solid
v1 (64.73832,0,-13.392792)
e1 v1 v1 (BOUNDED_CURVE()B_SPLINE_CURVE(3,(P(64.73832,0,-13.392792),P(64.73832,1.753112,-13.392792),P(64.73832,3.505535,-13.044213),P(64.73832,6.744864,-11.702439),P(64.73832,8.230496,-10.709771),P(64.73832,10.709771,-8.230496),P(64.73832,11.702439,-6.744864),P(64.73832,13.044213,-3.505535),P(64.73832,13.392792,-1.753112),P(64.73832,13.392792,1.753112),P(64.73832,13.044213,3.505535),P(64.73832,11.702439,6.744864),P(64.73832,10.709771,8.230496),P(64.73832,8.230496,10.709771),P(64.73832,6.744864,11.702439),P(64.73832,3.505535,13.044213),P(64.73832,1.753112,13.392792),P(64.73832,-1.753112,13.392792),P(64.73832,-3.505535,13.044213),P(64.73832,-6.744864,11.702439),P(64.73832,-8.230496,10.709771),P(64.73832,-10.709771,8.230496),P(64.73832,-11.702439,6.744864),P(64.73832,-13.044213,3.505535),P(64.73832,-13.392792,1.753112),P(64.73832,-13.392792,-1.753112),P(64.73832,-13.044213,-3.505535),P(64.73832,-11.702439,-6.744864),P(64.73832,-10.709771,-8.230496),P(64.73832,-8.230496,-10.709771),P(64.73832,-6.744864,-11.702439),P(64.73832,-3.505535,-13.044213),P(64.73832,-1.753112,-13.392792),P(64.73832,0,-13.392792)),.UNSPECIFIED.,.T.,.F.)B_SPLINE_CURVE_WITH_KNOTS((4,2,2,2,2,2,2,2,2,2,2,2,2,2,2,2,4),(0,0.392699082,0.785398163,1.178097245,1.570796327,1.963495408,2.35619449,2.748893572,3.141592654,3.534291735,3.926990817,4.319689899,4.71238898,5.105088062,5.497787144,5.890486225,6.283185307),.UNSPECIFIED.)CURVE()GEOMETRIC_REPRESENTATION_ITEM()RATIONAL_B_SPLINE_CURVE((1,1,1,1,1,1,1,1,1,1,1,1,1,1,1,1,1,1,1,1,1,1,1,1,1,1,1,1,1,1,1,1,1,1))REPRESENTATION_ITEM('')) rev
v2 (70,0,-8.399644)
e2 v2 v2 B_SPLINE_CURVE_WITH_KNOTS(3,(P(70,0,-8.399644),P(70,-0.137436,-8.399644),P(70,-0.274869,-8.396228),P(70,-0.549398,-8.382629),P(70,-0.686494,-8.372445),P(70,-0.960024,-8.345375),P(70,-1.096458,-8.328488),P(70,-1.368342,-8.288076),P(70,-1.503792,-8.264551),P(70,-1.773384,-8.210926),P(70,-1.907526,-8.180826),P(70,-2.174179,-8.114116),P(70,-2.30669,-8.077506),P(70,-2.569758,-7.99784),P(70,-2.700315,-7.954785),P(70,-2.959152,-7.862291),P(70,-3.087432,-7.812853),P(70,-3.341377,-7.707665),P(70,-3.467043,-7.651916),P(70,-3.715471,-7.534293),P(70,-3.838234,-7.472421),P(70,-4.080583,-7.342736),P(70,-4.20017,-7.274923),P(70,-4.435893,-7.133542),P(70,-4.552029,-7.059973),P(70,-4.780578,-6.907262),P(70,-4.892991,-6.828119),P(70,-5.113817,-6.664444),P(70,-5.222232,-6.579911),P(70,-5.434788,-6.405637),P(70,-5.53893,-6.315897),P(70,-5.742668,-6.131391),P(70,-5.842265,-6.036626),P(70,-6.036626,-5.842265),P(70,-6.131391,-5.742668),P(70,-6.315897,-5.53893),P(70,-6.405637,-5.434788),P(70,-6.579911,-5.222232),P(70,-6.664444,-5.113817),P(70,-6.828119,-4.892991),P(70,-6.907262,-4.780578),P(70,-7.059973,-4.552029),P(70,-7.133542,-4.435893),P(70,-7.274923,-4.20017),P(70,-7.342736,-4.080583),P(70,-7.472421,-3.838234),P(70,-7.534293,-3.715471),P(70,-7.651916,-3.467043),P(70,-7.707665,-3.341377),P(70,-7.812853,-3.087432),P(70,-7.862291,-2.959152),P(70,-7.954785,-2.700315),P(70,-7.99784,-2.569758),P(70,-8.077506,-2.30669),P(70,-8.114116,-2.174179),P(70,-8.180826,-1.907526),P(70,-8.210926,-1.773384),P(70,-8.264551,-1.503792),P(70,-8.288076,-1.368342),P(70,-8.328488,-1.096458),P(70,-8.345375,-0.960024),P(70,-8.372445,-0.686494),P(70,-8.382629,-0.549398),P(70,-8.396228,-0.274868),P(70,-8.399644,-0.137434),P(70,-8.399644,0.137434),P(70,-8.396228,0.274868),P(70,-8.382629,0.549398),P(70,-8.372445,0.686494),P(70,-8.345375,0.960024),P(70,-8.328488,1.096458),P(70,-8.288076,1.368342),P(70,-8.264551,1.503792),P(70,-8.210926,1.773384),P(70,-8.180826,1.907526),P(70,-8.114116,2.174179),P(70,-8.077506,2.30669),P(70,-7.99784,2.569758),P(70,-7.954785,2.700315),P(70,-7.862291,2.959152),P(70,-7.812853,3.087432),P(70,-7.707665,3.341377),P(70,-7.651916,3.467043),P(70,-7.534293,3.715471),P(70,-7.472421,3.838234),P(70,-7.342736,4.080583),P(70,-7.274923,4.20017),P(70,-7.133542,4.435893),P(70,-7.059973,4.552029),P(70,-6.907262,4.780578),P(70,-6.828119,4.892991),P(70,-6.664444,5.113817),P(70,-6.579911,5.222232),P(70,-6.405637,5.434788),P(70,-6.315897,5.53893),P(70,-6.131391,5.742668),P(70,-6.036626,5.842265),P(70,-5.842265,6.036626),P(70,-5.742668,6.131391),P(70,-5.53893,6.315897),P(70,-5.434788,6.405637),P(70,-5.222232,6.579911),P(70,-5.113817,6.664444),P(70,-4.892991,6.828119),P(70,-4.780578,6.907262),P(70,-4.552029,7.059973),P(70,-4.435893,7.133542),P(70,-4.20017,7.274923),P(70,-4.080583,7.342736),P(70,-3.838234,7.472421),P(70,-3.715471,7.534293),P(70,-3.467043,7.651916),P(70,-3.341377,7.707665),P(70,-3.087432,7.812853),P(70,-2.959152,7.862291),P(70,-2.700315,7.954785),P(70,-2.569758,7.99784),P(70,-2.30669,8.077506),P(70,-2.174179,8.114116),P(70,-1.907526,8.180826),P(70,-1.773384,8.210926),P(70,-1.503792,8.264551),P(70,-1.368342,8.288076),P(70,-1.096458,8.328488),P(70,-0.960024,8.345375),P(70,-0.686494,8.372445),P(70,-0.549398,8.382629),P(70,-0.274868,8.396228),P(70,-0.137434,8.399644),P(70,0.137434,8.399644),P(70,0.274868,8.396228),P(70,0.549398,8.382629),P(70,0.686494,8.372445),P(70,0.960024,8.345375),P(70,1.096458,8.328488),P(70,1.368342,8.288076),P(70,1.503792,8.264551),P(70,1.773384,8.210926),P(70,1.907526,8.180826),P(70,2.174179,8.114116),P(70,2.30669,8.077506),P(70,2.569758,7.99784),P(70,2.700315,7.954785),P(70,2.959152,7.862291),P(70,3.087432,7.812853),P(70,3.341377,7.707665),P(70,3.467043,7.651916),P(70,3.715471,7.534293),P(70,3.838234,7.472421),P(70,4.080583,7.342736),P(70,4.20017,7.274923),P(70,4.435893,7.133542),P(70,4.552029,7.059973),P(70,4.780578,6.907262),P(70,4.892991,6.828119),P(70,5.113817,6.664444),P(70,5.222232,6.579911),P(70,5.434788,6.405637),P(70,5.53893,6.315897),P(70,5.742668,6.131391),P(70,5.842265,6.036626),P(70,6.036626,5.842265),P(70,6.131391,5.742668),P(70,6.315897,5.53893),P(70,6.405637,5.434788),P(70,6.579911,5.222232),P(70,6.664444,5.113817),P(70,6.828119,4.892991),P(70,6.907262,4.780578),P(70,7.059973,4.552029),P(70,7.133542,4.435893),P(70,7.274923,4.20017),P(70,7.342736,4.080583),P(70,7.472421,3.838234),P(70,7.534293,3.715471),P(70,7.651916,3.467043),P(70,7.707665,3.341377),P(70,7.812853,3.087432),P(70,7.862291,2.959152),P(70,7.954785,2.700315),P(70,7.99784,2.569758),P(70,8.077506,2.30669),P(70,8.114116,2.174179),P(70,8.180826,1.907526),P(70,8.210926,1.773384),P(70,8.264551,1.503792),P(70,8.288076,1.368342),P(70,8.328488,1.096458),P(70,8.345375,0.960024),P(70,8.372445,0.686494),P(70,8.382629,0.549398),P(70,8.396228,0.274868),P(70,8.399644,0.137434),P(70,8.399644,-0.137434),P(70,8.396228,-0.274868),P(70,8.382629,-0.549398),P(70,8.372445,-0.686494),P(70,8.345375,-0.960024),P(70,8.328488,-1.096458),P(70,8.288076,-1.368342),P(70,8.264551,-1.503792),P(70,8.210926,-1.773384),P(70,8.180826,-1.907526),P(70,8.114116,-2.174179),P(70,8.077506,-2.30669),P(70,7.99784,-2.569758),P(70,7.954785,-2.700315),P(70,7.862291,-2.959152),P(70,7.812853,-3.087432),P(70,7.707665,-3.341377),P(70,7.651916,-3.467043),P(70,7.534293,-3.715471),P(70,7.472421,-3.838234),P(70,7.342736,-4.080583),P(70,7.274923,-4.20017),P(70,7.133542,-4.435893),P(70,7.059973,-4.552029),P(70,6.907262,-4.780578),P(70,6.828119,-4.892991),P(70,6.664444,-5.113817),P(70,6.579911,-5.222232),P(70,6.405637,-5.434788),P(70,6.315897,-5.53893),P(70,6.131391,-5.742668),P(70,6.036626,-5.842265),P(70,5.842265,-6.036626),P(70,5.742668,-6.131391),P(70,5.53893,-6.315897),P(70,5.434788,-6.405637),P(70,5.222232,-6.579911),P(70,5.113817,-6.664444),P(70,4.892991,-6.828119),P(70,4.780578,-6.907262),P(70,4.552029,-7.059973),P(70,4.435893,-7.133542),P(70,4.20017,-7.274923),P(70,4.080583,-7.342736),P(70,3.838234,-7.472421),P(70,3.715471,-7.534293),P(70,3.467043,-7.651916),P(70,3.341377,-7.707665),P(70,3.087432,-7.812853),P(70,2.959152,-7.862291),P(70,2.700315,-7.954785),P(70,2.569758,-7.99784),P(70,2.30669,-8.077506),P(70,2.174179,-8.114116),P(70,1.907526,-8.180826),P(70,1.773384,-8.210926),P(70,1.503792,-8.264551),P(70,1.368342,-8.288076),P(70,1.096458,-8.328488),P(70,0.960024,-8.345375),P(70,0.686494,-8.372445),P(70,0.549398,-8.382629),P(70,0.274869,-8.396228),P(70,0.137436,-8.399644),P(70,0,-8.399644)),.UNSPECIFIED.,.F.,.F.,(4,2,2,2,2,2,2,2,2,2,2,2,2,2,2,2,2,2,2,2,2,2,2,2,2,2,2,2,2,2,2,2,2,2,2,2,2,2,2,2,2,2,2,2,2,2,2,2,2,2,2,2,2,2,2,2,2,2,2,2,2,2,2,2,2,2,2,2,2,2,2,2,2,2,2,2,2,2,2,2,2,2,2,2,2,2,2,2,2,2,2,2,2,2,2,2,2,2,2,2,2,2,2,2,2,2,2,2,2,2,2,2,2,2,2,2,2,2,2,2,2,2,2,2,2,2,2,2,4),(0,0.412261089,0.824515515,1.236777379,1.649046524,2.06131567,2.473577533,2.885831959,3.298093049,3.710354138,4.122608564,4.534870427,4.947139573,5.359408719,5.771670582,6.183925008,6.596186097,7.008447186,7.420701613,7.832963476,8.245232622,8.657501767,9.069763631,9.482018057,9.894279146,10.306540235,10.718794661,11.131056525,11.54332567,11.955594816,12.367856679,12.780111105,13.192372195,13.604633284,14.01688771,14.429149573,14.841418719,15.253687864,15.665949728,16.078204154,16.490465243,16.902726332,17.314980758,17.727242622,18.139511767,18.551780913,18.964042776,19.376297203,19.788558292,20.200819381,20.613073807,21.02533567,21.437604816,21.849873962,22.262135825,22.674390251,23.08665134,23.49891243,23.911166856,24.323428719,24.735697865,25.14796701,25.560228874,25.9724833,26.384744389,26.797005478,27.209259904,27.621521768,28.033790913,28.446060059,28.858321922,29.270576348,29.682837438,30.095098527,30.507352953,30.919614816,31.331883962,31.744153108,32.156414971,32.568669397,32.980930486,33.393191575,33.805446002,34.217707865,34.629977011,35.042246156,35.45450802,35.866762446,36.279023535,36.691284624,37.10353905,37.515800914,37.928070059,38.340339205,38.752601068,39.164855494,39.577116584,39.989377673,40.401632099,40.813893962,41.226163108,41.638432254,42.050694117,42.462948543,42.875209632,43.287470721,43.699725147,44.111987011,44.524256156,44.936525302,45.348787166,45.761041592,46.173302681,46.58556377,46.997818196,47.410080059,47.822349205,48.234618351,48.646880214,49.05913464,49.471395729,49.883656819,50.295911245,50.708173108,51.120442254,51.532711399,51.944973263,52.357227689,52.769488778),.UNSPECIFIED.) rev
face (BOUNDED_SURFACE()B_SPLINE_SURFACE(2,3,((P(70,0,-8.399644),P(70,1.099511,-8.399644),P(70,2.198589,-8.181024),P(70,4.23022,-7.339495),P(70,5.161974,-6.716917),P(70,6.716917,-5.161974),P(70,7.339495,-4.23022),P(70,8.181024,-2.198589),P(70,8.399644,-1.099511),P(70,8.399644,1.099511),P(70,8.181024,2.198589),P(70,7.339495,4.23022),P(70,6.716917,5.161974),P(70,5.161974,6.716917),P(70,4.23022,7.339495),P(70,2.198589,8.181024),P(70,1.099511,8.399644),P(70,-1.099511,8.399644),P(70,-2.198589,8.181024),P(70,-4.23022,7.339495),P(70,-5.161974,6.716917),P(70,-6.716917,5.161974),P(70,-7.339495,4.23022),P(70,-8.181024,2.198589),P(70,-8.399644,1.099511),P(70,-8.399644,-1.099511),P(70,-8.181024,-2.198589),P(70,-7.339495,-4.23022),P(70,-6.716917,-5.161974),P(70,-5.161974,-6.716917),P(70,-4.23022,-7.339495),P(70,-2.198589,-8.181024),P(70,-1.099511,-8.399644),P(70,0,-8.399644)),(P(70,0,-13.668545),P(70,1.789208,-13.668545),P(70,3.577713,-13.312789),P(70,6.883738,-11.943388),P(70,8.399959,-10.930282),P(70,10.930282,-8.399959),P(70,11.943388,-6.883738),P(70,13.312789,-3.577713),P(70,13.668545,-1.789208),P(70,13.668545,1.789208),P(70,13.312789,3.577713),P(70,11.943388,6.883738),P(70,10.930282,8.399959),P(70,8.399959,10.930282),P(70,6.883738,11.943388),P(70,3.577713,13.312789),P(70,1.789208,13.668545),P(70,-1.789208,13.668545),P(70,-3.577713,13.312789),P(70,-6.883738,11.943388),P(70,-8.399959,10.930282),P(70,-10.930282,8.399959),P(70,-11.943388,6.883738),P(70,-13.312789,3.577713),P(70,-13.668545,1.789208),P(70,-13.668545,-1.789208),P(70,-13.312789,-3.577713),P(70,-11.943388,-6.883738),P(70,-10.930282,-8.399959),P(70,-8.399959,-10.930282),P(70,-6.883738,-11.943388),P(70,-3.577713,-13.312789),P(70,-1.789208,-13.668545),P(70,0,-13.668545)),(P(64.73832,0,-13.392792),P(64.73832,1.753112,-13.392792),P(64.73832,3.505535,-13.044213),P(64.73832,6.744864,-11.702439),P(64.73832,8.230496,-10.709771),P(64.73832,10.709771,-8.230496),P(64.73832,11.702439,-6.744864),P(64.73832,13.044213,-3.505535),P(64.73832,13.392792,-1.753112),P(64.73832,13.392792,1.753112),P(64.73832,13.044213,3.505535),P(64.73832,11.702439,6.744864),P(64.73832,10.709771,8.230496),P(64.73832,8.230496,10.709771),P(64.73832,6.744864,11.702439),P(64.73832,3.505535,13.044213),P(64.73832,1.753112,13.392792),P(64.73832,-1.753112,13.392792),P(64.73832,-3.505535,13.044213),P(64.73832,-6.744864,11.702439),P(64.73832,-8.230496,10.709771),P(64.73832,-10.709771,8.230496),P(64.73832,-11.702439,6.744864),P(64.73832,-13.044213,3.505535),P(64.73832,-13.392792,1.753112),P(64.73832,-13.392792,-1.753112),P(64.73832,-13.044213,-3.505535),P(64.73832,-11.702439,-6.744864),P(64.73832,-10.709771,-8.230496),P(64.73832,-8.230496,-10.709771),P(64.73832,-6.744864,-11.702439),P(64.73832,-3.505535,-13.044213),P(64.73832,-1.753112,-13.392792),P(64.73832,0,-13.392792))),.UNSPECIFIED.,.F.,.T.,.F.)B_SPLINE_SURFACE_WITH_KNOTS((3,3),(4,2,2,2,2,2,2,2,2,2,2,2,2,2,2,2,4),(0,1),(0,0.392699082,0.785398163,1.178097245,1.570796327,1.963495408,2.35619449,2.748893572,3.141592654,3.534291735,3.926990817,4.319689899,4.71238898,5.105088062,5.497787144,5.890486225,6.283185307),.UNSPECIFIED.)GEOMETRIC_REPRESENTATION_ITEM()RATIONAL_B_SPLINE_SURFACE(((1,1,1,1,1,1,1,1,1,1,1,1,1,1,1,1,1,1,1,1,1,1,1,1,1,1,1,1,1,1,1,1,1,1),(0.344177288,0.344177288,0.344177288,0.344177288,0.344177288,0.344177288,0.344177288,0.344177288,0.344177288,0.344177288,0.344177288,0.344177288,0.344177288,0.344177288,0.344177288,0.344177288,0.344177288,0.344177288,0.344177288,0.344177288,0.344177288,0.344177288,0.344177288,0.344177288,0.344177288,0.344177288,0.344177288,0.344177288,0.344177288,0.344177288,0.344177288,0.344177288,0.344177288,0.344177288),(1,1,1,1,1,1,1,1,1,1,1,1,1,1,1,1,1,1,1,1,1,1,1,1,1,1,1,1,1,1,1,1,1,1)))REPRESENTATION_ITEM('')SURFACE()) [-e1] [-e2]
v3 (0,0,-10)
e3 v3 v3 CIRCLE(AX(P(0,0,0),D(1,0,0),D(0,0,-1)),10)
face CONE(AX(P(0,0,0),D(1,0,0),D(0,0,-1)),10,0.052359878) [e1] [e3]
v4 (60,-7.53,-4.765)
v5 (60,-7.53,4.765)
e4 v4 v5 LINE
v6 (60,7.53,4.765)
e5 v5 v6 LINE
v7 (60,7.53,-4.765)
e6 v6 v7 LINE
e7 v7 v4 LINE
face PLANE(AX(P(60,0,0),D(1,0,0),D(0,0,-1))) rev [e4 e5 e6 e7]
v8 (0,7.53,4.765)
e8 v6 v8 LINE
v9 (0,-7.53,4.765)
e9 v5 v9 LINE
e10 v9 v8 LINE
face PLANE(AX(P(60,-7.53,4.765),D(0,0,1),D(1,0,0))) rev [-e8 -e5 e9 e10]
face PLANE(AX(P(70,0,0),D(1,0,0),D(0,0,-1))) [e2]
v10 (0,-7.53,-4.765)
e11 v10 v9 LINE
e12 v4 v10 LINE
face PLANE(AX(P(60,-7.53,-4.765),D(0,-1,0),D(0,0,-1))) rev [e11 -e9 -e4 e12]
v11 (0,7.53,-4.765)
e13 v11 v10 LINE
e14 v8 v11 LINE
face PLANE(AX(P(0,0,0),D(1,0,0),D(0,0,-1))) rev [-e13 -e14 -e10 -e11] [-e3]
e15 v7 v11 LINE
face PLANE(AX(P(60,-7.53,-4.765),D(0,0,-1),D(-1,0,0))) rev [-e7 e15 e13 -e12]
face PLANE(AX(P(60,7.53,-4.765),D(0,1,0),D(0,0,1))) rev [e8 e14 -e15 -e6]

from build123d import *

# Parameters (mm, degrees)
SZKIC1_R                    = 10
DODANIE_WYCI_GNI_CIE1_DEPTH = 70
DODANIE_WYCI_GNI_CIE1_DRAFT = -3
SZKIC2_W                    = 9.53
SZKIC2_H                    = 15.06
WYTNIJ_WYCI_GNI_CIE1_DEPTH  = 60


with BuildPart() as part:
    # Szkic1 → Dodanie-wyciągnięcie1 (with draft: the straight prism first)
    with BuildSketch(Plane(origin=(0, 0, 0), x_dir=(0, 0, -1), z_dir=(1, 0, 0))):
        Circle(SZKIC1_R)
    extrude(amount=DODANIE_WYCI_GNI_CIE1_DEPTH)
    # Dodanie-wyciągnięcie1: the draft: its side faces are tilted about the plane it starts from
    dodanie_wyci_gni_cie1_sides = [part.faces().sort_by_distance(p)[0] for p in [
        (35, 0, 10),
    ]]
    draft(dodanie_wyci_gni_cie1_sides, Plane(origin=(0, 0, 0), x_dir=(0, 0, -1), z_dir=(1, 0, 0)), DODANIE_WYCI_GNI_CIE1_DRAFT)

    # Zaokrąglenie1
    # a fillet whose section is not a circle: 5 mm, written as the material it takes off along each edge
    with BuildSketch(Plane(origin=(70, 0, 0), x_dir=(0, 0, -1), z_dir=(0, -1, 0))) as zaokr_glenie1_piece_1:
        with BuildLine():
            Bezier((13.392791597, -5.261679781), (13.66854455, 0), (8.399643923, 0), weights=[1, 0.344177288, 1])
            Line((8.399643923, 0), (13.66854455, 0))
            Line((13.66854455, 0), (13.392791597, -5.261679781))
        make_face()
    revolve(axis=Axis((70, 0, 0), (1, 0, 0)), mode=Mode.SUBTRACT)

    # Szkic2 → Wytnij-wyciągnięcie1 (cut)
    with BuildSketch(Plane.ZY):
        Rectangle(SZKIC2_W, SZKIC2_H)
    extrude(amount=-WYTNIJ_WYCI_GNI_CIE1_DEPTH, mode=Mode.SUBTRACT)


solid = part.part
